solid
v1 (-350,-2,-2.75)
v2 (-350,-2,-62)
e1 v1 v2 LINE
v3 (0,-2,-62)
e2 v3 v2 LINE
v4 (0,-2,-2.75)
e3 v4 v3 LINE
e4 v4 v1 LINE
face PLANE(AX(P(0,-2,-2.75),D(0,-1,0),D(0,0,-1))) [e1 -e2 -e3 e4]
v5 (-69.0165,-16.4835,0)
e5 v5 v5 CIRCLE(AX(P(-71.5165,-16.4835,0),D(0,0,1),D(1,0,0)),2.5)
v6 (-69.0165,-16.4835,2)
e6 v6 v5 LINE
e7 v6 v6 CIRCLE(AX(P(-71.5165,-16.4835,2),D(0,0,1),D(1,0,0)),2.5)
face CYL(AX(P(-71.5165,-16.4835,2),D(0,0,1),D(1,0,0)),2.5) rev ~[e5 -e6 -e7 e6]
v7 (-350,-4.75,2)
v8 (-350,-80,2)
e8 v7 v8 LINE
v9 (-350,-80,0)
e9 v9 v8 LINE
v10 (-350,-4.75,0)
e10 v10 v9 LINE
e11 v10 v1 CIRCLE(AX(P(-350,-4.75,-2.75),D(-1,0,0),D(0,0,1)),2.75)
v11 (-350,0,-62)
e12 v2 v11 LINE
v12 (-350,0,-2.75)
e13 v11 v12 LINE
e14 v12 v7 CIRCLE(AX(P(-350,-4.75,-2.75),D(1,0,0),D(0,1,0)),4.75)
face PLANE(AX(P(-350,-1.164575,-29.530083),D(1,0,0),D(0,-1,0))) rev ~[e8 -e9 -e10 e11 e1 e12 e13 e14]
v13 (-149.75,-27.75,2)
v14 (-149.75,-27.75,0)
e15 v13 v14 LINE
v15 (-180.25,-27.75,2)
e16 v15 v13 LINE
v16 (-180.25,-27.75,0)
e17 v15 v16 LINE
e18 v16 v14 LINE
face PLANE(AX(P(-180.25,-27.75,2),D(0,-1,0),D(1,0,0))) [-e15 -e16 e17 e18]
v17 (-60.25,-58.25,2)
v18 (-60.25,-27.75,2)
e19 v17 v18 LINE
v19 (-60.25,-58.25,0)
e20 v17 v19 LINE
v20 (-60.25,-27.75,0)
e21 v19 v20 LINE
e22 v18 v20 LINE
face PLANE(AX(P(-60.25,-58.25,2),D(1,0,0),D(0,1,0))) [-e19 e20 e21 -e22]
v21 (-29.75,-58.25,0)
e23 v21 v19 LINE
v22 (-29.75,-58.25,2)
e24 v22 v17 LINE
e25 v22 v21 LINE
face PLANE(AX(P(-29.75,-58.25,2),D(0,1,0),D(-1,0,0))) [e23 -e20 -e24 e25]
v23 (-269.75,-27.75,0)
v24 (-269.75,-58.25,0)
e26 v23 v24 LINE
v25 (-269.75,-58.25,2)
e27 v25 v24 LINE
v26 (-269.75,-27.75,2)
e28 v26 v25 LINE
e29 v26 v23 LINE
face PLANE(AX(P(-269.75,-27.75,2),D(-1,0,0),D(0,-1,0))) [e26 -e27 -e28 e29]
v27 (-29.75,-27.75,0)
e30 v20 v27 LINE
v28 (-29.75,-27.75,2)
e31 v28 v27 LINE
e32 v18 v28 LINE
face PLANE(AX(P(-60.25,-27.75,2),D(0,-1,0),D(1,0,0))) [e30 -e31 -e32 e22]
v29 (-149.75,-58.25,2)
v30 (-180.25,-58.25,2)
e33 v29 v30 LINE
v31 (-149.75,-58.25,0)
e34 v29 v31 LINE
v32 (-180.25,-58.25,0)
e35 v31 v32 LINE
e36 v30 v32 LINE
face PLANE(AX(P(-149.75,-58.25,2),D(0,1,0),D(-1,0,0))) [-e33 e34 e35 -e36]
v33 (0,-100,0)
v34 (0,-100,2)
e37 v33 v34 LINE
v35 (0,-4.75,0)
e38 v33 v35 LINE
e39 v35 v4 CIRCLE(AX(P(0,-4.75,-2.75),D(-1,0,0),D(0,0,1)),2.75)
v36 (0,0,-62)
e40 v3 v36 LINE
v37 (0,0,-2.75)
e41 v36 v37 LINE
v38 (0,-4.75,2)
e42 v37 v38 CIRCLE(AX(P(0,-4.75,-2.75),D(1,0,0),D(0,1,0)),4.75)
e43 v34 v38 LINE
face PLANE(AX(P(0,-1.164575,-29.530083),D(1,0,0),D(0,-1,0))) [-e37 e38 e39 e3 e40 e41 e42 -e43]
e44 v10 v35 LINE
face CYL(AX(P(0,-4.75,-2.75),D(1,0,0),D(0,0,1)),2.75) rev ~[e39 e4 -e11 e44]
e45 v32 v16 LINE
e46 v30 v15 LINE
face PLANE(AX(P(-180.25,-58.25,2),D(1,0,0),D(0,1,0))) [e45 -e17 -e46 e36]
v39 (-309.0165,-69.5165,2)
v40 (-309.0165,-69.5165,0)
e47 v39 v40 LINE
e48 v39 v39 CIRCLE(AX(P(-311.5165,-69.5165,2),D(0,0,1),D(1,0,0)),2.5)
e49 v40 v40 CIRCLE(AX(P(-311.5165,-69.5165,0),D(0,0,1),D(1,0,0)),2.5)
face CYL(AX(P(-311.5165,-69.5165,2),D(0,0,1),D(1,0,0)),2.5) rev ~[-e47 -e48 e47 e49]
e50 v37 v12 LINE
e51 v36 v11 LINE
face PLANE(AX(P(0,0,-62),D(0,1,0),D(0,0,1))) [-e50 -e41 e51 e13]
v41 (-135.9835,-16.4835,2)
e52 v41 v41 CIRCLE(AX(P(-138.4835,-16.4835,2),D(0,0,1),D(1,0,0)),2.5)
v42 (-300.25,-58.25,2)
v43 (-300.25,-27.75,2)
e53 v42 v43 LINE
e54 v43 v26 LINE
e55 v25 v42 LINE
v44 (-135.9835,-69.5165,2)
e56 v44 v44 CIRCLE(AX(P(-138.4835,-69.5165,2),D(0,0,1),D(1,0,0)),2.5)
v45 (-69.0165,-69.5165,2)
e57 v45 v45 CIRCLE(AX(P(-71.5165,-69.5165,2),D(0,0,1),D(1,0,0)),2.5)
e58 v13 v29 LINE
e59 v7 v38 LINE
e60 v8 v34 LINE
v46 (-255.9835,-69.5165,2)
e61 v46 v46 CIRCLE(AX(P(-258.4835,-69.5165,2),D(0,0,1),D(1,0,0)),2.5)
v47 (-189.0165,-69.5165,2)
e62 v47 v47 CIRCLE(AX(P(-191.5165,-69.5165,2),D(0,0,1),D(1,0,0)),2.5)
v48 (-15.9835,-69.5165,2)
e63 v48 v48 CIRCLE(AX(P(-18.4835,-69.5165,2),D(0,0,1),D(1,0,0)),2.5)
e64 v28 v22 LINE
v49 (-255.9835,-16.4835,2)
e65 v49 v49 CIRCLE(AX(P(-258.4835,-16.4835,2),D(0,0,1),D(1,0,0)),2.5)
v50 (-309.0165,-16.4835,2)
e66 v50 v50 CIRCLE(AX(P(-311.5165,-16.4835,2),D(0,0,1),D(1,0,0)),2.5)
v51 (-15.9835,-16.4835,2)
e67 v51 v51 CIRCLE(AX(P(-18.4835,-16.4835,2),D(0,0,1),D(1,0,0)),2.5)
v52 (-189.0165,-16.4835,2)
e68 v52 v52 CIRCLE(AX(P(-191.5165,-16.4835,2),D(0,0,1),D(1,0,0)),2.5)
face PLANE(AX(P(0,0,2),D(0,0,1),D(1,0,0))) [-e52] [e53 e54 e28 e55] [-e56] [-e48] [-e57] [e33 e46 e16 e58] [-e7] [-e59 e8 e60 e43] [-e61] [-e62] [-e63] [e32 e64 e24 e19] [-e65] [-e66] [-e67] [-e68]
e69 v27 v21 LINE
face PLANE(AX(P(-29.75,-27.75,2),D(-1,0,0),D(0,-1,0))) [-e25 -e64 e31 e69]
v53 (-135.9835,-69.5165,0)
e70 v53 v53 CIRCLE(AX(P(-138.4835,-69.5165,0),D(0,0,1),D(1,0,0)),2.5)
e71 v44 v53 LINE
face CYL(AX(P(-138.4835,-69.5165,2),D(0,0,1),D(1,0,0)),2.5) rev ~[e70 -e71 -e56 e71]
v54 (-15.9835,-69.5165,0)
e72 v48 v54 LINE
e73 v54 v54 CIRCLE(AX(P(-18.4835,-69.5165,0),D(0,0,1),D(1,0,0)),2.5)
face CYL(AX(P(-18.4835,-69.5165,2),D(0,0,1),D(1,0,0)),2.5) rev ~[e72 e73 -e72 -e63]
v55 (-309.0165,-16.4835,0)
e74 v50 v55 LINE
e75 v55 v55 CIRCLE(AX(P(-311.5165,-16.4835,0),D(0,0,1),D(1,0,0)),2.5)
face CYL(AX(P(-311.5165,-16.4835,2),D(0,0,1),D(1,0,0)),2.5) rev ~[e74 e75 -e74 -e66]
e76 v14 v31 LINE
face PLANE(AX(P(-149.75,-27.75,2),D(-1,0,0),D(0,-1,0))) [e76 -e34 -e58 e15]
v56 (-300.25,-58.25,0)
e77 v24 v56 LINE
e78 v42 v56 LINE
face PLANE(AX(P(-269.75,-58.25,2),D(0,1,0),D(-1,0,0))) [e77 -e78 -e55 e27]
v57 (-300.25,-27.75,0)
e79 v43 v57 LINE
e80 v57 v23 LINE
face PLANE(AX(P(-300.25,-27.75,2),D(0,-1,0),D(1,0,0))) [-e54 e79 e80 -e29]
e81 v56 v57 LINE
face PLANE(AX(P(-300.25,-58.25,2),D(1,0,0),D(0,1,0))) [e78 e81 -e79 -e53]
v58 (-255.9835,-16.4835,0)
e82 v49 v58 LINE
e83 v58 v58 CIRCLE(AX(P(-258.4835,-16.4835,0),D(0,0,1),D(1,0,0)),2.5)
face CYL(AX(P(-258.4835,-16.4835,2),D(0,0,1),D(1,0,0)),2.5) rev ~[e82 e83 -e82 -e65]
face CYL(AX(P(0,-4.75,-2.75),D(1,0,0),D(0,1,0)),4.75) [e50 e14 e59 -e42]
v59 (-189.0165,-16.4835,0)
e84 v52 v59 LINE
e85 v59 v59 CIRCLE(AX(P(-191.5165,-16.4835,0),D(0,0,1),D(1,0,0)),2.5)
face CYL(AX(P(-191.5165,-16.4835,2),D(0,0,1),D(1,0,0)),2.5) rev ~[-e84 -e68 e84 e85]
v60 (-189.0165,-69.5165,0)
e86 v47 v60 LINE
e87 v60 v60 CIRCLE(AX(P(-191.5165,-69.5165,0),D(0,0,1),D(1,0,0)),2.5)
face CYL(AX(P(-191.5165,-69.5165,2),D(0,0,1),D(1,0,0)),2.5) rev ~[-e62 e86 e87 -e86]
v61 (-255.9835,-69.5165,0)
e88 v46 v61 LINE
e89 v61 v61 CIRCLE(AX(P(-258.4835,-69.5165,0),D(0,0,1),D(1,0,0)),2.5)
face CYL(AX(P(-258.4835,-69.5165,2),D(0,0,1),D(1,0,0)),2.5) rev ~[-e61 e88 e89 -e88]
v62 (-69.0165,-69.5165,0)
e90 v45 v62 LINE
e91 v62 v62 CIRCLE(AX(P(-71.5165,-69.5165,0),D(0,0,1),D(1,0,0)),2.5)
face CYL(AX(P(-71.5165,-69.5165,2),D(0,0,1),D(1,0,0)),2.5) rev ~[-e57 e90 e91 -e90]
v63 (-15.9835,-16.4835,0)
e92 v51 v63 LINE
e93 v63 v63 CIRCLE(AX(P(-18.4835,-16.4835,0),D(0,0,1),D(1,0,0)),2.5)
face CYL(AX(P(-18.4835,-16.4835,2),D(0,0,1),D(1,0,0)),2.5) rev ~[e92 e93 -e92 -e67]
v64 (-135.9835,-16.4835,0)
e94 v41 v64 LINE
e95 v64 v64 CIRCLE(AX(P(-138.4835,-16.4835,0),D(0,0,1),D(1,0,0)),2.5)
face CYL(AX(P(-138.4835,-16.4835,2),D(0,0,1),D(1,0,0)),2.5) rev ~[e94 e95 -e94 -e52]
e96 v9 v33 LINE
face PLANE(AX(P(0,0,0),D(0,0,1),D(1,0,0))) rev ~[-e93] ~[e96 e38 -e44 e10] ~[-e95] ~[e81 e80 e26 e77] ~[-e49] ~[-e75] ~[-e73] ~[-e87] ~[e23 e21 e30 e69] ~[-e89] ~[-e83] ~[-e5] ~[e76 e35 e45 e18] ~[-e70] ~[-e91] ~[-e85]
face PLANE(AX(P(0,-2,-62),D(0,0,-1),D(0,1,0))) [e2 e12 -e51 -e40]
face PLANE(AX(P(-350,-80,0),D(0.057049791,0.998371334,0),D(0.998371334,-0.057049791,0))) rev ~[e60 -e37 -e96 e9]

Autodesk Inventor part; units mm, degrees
ref_plane "YZ Plane" through (0, 0, 0) normal (1, 0, 0) x (0, 1, 0)
ref_plane "XZ Plane" through (0, 0, 0) normal (0, 1, 0) x (-1, 0, 0)
ref_plane "XY Plane" through (0, 0, 0) normal (0, 0, 1) x (1, 0, 0)
sketch "Sketch1" plane through (0, 0, 0) normal (0, 0, 1) x (1, 0, 0)
  line L0 (0, 0) -> (-350, 0)
  line L1 (0, -100) -> (0, 0)
  line L2 (-350, 0) -> (-350, -80)
  line L3 (-350, -80) -> (0, -100)
  point P0 (0, -50)
  dimension "d32" = 100
  dimension "d60" = 80
  dimension "d61" = 350
extrude "Plate1" add sketch "Sketch1" along normal blind 2
sketch "Sketch8" plane through (0, 0, 2) normal (0, 0, 1) x (1, 0, 0)
  line L0 (-29.75, -58.25) -> (-60.25, -58.25)
  line L1 (-60.25, -58.25) -> (-60.25, -27.75)
  line L2 (-60.25, -27.75) -> (-29.75, -27.75)
  line L3 (-29.75, -27.75) -> (-29.75, -58.25)
  line L4 (-29.75, -58.25) -> (-60.25, -27.75) construction
  line L5 (-60.25, -58.25) -> (-29.75, -27.75) construction
  circle A0 centre (-18.4835, -69.5165) radius 2.5
  circle A1 centre (-71.5165, -69.5165) radius 2.5
  circle A2 centre (-71.5165, -16.4835) radius 2.5
  circle A3 centre (-18.4835, -16.4835) radius 2.5
  circle A4 centre (-45, -43) radius 37.5 construction
  line L6 (0, 0) -> (0, -100) projected
  line L7 (-350, 0) -> (0, 0) projected
  line L8 (-60.25, -58.25) -> (-71.5165, -69.5165) construction
  dimension "d51" = 30.5
  dimension "d52" = 30.5
  dimension "d53" = 5
  dimension "d72" = 45
  dimension "d73" = 43
  dimension "d74" = 15.9332
  dimension "d75" = 75
extrude "Cut3" cut sketch "Sketch8" against normal blind 2
pattern_linear "Rectangular Pattern1" count 3 spacing 120 along (-1, 0, 0) of "Cut3"
sketch "Sketch9" plane through (0, -2, 2) normal (0, 1, 0) x (-1, 0, 0)
  line L0 (350, 0) -> (0, 0)
  line L1 (0, 0) -> (0, -64)
  line L2 (0, -64) -> (350, -64)
  line L3 (350, -64) -> (350, 0)
edge flange "Flange3" height 64 angle 90 thickness 2 bend radius 2.75 thickness toward (0, 1, 0) relief round relief width 2 relief depth 1 edges at (-175, 0, 0) wall of the first edge with corners at (-350, -2, 2) (0, -2, 2) (0, -2, -62) (-350, -2, -62)
bend "Bend3"
corner "Corner3"
equation "\"d32\" = Main_way_hight"
equation "\"d51\" = d52"
equation "\"d55\" = Thickness"
equation "\"d2\" = Thickness"
equation "\"d62\" = BendReliefWidth"
equation "\"d63\" = BendReliefDepth"
equation "\"d64\" = MinimumRemnant"
equation "\"d65\" = TransitionRadius"
equation "\"d66\" = MAIN_7_central_window_width + 2 * Thickness"
equation "\"d68\" = BendRadius"
equation "\"d69\" = CornerReliefSize"
equation "\"d70\" = GapSize"
equation "\"d71\" = JacobiRadiusSize"
equation "\"BendReliefWidth\" = Thickness"
equation "\"BendReliefDepth\" = 0.5 * Thickness"
equation "\"CornerReliefSize\" = 4 * Thickness"
equation "\"MinimumRemnant\" = 2 * Thickness"
equation "\"TransitionRadius\" = BendRadius"
equation "\"JacobiRadiusSize\" = BendRadius"
equation "\"GapSize\" = Thickness"
equation "\"Main_way_hight\" = 100"
equation "\"Thickness\" = 2"
equation "\"MAIN_7_central_window_width\" = 60"
equation "\"BendRadius\" = 2.75"
properties part number "ANP 1422 BOTTOM FDS diameter way up" material "Stainless Steel"
